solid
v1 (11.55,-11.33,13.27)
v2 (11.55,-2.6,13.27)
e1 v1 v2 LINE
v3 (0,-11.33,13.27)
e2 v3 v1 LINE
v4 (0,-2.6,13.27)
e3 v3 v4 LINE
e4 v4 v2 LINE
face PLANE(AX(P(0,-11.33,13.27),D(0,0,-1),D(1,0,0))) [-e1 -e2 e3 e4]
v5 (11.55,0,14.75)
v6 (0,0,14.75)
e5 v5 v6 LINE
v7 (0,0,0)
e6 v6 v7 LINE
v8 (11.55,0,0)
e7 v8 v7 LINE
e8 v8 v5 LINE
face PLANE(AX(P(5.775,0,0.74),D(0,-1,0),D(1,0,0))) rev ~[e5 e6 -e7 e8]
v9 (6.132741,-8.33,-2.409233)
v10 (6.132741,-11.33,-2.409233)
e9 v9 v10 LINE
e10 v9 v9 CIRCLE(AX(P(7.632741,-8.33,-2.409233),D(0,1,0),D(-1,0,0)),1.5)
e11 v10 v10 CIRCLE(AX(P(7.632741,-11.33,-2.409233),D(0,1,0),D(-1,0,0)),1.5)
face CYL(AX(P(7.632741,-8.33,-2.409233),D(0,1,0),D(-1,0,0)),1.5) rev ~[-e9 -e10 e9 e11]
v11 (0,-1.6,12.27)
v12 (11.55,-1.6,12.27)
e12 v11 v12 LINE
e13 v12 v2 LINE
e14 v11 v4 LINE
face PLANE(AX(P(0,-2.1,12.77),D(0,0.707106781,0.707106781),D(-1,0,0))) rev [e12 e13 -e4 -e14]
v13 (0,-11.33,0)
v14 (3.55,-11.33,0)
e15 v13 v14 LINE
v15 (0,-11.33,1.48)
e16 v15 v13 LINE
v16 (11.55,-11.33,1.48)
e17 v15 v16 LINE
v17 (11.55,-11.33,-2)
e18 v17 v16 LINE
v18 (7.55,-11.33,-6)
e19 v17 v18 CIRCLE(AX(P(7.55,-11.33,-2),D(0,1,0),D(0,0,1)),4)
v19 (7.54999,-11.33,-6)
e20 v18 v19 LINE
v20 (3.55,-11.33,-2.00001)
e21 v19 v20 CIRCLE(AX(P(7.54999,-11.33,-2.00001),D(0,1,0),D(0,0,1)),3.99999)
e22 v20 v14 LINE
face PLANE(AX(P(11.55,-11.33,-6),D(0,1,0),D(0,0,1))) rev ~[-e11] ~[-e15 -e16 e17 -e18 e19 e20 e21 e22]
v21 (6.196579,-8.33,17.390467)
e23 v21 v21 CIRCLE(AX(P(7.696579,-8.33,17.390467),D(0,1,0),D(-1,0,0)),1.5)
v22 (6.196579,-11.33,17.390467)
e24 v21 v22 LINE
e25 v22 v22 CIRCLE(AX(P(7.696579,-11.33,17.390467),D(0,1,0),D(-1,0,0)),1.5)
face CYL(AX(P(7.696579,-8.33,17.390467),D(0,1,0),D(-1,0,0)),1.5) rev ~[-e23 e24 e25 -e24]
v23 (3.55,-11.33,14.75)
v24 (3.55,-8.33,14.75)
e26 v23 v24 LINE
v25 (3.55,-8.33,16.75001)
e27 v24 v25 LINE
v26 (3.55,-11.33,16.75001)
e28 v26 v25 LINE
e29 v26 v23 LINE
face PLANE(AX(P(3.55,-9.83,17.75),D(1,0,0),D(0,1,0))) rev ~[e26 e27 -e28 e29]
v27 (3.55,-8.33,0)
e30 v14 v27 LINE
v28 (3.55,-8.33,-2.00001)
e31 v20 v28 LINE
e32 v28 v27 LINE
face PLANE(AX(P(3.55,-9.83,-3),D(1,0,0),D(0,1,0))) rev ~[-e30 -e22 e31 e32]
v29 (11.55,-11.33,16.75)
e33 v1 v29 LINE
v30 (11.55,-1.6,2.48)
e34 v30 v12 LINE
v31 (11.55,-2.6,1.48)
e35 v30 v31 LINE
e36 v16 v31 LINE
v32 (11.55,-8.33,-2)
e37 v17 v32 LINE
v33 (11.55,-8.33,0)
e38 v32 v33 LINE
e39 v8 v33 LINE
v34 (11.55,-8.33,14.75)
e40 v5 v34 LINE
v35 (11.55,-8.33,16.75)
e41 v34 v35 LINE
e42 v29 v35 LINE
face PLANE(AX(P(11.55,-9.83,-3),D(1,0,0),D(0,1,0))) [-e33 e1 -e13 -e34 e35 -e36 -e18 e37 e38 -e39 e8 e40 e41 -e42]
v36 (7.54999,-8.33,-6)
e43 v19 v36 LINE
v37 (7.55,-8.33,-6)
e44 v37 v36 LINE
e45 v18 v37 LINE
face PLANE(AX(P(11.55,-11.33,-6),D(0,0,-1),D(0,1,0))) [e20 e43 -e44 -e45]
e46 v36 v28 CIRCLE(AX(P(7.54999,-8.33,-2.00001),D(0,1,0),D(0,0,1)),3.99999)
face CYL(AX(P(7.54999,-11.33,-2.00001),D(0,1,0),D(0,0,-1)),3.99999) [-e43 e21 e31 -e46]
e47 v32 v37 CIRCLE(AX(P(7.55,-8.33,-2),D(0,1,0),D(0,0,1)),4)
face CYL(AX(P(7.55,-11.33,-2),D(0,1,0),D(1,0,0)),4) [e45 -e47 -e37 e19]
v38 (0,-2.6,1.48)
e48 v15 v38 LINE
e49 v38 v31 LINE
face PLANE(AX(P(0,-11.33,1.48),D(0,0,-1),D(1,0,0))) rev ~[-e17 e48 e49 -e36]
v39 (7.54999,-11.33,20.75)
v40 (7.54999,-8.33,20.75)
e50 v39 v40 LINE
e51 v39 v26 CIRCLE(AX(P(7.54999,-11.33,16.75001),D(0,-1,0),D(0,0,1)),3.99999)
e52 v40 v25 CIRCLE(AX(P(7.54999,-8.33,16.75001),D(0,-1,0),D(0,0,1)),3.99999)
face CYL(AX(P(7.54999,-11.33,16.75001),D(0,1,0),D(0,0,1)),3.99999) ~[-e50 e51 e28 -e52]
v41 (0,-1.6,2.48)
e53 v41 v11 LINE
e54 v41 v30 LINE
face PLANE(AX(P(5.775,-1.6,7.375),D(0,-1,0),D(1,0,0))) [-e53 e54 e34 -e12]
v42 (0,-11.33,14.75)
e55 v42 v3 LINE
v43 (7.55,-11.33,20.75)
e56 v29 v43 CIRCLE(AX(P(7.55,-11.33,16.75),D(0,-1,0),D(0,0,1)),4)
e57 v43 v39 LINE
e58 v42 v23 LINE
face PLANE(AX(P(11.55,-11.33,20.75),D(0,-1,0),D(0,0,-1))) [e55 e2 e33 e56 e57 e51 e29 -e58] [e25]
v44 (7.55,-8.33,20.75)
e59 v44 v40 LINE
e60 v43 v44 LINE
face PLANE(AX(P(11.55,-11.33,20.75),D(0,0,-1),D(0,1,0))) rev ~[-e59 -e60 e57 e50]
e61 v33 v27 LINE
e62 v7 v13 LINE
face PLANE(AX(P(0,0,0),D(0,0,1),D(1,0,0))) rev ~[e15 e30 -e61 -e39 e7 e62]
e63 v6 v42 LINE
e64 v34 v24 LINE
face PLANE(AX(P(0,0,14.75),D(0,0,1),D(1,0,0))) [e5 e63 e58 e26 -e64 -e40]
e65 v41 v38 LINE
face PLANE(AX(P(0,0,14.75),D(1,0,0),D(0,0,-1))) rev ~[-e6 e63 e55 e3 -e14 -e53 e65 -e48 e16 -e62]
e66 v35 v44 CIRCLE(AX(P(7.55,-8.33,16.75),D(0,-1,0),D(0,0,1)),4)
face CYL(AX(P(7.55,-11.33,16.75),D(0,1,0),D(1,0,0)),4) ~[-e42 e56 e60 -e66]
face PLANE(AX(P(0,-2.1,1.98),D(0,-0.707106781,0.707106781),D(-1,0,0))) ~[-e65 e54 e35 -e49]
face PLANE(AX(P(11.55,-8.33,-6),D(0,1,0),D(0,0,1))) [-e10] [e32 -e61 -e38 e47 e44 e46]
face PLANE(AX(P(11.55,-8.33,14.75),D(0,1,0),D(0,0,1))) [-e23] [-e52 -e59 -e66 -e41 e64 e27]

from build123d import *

# Parameters (mm, degrees)
F0_W      = 11.55
F0_H      = 1.48
F0_H_2    = 11.79
F1_DEPTH  = 11.33
F2_W      = 11.55
F2_H      = 11.79
F3_DEPTH  = 9.73
F4_W      = 3
F4_H      = 6
F5_DEPTH  = 8
F6_W      = 3
F6_H      = 6
F7_DEPTH  = 8
F8_R      = 4
F9_R      = 3.99999
F10_R     = 4
F11_R     = 3.99999
F12_R     = 1.5
F13_DEPTH = 25
F14_R     = 1.5
F15_DEPTH = 25
F16_SIZE  = 1
F17_SIZE  = 1


# Not quite as in the source:
# - a fillet or chamfer is up to 0.001 mm smaller than in the source, because OpenCascade refuses the exact size


with BuildPart() as f1:
    # F0 (on Front) → F1 (new body)
    with BuildSketch(Plane.XZ):
        with Locations((5.775, 0.74)):
            Rectangle(F0_W, F0_H)
        with Locations((5.775, 14.01)):
            Rectangle(F0_W, F0_H)
        with Locations((5.775, 7.375)):
            Rectangle(F0_W, F0_H_2)
    extrude(amount=F1_DEPTH)

    # F2 (on face) → F3 (cut)
    with BuildSketch(Plane.XZ.offset(11.33)):
        with Locations((5.775, 7.375)):
            Rectangle(F2_W, F2_H)
    extrude(amount=-F3_DEPTH, mode=Mode.SUBTRACT)

    # F4 (on face) → F5 (join)
    with BuildSketch(Plane.YZ.offset(11.55)):
        with Locations((-9.83, 17.75)):
            Rectangle(F4_W, F4_H)
        Polygon((-8.33, 14.75), (-11.33, 14.75), (-11.33, 13.27), (-1.6, 13.27), (-1.6, 1.48), (-11.33, 1.48), (-11.33, 0), (0, 0), (0, 14.75), align=None)
    extrude(amount=-F5_DEPTH)

    # F6 (on face) → F7 (join)
    with BuildSketch(Plane.YZ.offset(11.55)):
        with Locations((-9.83, -3)):
            Rectangle(F6_W, F6_H)
    extrude(amount=-F7_DEPTH)

    # F8
    f8_edges = [f1.edges().sort_by_distance(p)[0] for p in [
        (11.55, -9.83, 20.75),
    ]]
    fillet(f8_edges, radius=F8_R)

    # F9 (radius 4 in the source; OpenCascade refuses exactly that, so slightly less here)
    f9_edges = [f1.edges().sort_by_distance(p)[0] for p in [
        (3.55, -9.83, 20.75),
    ]]
    fillet(f9_edges, radius=F9_R)

    # F10
    f10_edges = [f1.edges().sort_by_distance(p)[0] for p in [
        (11.55, -9.83, -6),
    ]]
    fillet(f10_edges, radius=F10_R)

    # F11 (radius 4 in the source; OpenCascade refuses exactly that, so slightly less here)
    f11_edges = [f1.edges().sort_by_distance(p)[0] for p in [
        (3.55, -9.83, -6),
    ]]
    fillet(f11_edges, radius=F11_R)

    # F12 (on face) → F13 (cut)
    with BuildSketch(Plane(origin=(0, -8.33, 0), x_dir=(-1, 0, 0), z_dir=(0, 1, 0))):
        with Locations((-7.6327412389, -2.4092334788)):
            Circle(F12_R)
    extrude(amount=-F13_DEPTH, mode=Mode.SUBTRACT)

    # F14 (on face) → F15 (cut)
    with BuildSketch(Plane(origin=(0, -8.33, 0), x_dir=(-1, 0, 0), z_dir=(0, 1, 0))):
        with Locations((-7.6965787448, 17.3904672265)):
            Circle(F14_R)
    extrude(amount=-F15_DEPTH, mode=Mode.SUBTRACT)

    # F16
    f16_edges = [f1.edges().sort_by_distance(p)[0] for p in [
        (5.775, -1.6, 13.27),
    ]]
    chamfer(f16_edges, length=F16_SIZE)

    # F17
    f17_edges = [f1.edges().sort_by_distance(p)[0] for p in [
        (5.775, -1.6, 1.48),
    ]]
    chamfer(f17_edges, length=F17_SIZE)


solid = f1.part
